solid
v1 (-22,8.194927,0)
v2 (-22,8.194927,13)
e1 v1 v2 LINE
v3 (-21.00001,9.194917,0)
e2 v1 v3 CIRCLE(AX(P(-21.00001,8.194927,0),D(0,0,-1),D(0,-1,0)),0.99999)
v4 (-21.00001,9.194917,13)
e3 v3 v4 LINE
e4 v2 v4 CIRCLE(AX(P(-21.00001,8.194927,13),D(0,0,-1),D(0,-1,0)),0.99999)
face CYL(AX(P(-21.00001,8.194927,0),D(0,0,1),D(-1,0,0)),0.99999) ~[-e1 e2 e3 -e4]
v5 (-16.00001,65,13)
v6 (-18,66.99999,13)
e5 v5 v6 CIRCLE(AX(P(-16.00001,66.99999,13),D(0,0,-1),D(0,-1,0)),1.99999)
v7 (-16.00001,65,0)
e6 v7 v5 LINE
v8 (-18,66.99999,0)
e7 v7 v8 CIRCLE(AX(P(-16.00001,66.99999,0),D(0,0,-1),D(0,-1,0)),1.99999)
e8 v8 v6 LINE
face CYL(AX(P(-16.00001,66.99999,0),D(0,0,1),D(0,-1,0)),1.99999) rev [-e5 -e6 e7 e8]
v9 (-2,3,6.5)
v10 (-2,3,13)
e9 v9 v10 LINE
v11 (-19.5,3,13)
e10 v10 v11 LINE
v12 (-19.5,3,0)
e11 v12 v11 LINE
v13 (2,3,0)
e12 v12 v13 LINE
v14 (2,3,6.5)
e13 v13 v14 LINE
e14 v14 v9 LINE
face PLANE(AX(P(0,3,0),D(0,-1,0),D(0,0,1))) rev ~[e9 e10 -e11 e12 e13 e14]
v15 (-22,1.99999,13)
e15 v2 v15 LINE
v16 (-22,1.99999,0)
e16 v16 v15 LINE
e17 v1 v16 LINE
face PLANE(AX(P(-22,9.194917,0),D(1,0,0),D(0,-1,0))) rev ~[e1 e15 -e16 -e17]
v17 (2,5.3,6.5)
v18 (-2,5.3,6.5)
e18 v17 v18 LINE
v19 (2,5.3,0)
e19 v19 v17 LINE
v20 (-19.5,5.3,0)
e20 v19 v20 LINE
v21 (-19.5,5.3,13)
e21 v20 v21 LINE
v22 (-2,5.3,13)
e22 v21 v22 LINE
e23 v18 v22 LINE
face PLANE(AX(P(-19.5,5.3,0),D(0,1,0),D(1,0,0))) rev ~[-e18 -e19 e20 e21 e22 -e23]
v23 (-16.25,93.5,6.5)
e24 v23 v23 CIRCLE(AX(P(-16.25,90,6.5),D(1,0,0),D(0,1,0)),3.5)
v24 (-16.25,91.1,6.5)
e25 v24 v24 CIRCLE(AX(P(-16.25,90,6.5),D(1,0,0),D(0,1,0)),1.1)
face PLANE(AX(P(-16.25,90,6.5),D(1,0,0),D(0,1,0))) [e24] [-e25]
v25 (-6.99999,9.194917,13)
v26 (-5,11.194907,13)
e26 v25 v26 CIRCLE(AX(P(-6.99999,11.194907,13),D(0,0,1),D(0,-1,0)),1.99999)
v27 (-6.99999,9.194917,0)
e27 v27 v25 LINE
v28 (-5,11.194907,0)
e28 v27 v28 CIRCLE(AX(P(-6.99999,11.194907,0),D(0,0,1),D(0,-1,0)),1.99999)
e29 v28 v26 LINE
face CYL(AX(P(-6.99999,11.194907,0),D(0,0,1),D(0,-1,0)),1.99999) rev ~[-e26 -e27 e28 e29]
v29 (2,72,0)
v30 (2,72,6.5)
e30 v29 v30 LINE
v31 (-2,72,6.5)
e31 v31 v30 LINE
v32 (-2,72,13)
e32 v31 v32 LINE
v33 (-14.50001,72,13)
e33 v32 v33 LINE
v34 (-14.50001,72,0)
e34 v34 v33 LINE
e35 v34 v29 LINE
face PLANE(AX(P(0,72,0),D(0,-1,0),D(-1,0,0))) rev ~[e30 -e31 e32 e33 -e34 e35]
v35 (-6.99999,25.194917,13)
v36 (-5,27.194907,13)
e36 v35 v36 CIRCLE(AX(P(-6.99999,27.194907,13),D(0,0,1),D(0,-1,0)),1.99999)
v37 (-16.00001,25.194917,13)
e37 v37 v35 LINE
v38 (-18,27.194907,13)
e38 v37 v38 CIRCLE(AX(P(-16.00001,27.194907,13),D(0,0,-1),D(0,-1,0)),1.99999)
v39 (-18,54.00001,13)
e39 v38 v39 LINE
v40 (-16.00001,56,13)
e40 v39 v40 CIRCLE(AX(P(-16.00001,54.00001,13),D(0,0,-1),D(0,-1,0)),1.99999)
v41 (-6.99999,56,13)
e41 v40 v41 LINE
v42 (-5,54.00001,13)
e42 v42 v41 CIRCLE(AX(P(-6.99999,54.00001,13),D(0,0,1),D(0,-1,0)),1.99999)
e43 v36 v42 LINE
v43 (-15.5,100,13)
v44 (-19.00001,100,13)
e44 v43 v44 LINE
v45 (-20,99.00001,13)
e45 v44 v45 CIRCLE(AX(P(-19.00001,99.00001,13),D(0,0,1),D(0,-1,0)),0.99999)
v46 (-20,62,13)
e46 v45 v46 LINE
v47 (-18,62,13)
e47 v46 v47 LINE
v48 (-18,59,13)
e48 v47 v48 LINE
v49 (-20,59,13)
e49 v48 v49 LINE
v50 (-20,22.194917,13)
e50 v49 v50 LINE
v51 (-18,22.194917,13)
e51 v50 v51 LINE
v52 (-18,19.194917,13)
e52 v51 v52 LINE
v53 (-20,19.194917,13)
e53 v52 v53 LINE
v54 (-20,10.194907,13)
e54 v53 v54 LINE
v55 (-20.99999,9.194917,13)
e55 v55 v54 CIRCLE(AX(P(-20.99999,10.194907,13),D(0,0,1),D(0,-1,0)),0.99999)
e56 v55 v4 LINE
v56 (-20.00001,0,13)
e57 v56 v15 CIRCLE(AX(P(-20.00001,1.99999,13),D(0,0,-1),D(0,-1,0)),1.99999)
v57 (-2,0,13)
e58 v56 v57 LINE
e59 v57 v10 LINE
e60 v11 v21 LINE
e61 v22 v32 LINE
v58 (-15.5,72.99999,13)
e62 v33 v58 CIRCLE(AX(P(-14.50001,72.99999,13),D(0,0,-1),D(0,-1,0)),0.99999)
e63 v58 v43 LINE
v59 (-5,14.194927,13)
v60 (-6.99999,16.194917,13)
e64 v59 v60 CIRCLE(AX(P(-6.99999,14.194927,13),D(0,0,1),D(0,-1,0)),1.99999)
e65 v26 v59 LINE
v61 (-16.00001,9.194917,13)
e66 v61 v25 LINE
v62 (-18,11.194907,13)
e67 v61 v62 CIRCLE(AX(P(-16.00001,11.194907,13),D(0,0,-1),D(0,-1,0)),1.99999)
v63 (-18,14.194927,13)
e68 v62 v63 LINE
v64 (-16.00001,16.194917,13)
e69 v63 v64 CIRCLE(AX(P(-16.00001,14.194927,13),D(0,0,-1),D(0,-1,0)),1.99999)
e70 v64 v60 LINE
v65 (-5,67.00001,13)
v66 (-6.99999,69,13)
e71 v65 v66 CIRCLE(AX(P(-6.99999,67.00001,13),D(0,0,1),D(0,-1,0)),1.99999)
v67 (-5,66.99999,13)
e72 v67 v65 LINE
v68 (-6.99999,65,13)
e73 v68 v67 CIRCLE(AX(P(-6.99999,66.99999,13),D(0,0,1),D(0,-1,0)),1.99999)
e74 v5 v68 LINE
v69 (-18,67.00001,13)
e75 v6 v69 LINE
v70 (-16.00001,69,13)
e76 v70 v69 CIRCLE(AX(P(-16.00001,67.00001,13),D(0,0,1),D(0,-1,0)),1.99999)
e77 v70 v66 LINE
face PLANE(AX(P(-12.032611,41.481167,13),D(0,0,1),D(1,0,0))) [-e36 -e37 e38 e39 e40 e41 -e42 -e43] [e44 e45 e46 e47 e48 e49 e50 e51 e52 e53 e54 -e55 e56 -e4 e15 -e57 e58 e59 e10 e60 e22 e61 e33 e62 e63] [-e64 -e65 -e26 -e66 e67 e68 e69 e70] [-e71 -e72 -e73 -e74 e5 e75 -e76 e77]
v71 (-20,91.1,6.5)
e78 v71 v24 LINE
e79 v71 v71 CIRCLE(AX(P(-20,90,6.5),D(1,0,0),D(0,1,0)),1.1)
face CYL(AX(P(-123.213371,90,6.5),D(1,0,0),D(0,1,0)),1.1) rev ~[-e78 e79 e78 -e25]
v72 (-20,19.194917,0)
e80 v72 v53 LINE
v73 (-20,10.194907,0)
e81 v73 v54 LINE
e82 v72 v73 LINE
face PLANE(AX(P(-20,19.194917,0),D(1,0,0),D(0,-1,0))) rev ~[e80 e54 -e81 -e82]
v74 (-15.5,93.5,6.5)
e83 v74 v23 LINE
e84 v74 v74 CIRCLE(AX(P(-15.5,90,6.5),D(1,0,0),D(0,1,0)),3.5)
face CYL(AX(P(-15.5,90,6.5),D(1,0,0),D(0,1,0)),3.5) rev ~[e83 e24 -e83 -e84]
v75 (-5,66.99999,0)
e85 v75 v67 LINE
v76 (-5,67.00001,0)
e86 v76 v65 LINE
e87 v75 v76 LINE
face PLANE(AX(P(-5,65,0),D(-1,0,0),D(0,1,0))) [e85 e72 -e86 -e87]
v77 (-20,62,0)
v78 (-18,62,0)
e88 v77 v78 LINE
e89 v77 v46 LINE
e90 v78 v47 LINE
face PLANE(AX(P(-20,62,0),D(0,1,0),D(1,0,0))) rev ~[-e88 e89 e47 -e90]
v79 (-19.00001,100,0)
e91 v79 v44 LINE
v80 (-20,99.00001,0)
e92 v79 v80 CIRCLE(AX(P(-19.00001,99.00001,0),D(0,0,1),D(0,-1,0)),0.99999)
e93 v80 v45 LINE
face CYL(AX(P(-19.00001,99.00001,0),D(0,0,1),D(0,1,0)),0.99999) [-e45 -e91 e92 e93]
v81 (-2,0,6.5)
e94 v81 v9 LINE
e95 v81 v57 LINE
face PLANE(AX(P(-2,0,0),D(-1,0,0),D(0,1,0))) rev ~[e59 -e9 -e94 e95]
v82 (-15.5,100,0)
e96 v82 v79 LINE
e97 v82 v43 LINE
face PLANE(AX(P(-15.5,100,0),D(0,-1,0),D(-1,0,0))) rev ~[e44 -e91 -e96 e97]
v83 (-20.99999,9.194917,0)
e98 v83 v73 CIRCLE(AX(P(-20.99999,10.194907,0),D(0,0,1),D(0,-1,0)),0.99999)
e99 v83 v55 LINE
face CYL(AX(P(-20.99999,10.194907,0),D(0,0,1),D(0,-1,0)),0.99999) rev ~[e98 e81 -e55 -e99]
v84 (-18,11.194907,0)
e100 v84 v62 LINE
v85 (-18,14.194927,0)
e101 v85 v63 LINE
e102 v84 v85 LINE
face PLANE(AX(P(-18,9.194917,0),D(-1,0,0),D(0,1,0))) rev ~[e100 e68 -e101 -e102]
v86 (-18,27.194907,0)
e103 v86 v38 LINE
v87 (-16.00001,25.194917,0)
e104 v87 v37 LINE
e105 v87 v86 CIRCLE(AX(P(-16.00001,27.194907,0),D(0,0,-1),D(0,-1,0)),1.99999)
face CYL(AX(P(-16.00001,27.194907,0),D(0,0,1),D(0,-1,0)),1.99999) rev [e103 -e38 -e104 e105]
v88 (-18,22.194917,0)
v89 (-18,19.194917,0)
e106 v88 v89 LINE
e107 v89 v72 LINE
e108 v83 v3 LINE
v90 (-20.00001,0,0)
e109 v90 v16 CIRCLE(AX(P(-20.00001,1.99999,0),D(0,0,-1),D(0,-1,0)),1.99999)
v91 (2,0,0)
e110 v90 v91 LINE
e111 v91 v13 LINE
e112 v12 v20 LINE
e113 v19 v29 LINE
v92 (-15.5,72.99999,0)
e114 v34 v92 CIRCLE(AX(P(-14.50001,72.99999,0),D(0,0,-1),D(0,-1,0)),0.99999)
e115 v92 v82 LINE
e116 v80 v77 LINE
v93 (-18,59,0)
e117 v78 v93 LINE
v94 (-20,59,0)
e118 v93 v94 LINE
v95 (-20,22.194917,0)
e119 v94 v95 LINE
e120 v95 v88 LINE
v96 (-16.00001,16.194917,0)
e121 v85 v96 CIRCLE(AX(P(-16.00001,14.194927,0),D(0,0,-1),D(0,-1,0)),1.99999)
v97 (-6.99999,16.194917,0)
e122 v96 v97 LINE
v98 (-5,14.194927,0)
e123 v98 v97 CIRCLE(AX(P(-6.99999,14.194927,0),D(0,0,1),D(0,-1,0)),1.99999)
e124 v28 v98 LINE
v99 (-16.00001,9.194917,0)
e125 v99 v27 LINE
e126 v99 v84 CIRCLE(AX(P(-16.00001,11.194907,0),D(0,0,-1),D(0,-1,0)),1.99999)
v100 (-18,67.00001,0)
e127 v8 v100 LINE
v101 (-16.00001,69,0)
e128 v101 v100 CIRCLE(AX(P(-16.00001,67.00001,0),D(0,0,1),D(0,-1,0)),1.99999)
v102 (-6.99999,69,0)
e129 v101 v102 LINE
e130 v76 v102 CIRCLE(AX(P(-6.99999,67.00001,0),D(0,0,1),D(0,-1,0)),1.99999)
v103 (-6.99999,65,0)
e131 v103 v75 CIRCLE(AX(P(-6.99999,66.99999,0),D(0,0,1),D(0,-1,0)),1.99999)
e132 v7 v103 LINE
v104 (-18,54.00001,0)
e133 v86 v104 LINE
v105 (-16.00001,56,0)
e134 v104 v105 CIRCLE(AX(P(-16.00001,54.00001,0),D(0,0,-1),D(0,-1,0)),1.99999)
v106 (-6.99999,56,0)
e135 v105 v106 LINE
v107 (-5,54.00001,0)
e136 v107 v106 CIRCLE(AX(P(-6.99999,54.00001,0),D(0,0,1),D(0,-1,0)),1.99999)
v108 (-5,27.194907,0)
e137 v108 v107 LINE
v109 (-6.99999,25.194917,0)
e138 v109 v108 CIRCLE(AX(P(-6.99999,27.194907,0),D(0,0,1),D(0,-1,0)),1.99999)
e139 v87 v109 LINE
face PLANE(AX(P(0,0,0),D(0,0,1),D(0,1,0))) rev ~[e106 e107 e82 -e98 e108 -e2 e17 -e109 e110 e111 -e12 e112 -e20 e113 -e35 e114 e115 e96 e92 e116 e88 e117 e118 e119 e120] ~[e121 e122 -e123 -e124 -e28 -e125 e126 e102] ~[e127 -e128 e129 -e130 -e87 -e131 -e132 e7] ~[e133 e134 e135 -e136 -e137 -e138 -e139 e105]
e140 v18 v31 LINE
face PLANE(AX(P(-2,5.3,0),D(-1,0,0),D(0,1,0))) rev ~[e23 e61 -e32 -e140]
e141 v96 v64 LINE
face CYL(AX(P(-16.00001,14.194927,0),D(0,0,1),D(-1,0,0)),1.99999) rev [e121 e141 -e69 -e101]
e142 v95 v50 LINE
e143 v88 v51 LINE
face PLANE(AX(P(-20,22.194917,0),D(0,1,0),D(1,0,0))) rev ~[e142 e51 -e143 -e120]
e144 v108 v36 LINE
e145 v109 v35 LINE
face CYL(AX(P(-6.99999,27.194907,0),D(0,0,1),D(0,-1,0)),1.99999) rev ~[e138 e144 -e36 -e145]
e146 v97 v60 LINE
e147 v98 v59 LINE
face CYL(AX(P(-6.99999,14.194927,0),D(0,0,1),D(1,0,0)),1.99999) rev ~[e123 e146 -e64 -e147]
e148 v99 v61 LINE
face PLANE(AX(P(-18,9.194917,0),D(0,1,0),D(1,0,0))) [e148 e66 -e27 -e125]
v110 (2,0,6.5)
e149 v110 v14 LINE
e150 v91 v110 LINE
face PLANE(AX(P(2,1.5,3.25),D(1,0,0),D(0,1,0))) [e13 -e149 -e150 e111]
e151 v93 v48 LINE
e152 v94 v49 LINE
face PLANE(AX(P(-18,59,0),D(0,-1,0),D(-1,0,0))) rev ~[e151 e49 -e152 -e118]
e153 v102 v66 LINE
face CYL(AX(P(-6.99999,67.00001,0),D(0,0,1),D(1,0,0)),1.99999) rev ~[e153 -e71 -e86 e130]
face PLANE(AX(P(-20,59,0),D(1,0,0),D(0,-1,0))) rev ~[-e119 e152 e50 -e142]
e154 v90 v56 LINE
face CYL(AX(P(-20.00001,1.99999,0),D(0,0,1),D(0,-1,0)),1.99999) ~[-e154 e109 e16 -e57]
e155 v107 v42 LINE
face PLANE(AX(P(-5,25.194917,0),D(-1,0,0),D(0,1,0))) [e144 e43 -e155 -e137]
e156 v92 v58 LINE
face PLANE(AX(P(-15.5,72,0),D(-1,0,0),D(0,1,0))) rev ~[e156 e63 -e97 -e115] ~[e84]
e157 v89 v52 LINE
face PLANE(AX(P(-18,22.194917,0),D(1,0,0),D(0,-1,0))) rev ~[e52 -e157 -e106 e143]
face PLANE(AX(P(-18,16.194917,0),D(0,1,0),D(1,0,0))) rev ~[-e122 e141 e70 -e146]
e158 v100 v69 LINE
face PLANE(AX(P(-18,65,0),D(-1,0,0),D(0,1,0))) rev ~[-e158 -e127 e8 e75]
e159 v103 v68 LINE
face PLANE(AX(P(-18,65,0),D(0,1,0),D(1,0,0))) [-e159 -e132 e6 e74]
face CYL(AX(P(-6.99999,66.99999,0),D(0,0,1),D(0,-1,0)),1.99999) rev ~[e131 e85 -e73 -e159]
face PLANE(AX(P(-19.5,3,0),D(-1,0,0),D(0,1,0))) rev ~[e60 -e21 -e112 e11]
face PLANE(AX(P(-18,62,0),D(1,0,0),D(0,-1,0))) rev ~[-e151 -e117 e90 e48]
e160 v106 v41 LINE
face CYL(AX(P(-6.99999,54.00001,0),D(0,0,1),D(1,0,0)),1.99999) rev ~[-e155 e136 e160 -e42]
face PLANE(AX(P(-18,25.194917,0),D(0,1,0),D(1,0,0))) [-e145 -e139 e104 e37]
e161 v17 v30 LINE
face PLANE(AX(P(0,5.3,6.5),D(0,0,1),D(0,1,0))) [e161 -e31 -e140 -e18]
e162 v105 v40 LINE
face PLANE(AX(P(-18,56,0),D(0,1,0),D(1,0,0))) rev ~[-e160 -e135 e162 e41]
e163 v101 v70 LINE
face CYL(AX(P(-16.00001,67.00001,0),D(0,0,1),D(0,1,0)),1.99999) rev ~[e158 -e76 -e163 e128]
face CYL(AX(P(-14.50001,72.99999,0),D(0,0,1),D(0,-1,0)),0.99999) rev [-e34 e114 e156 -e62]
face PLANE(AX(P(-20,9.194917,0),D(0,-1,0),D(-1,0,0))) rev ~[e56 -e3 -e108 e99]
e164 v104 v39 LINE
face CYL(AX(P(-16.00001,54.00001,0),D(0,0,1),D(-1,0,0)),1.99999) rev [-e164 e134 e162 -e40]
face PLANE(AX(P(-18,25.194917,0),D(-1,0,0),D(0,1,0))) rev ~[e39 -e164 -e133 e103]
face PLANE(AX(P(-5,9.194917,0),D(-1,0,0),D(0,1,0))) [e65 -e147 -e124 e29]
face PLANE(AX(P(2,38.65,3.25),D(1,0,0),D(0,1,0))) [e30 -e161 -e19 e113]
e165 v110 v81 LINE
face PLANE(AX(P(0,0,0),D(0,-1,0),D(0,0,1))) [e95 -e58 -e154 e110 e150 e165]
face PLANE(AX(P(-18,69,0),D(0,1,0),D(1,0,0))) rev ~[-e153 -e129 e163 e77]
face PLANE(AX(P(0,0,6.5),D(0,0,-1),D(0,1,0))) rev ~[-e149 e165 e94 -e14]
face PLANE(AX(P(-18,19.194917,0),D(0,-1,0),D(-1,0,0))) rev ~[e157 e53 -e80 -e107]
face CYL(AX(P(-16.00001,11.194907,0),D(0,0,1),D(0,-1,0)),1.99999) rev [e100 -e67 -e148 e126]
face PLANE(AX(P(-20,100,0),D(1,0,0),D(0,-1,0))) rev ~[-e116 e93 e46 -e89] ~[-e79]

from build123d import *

# Parameters (mm, degrees)
F0_W      = 13
F0_H      = 7
F0_H_2    = 30.8050829545
F0_H_3    = 4
F1_DEPTH  = 13
F3_R      = 1.99999
F4_R      = 0.99999
F5_D      = 2.2
F7_W      = 3
F7_H      = 6.5
F6_W      = 66.7
F6_H      = 6.5
F8_DEPTH  = 2
F9_DEPTH  = 2
F10_R     = 3.5
F10_R_2   = 1.1
F11_DEPTH = 0.75


# Not quite as in the source:
# - a fillet or chamfer is up to 0.001 mm smaller than in the source, because OpenCascade refuses the exact size


with BuildPart() as f1:
    # F0 (on Top) → F1 (new body)
    with BuildSketch(Plane.XY):
        Polygon((-22, 0), (0, 0), (0, 3), (-19.5, 3), (-19.5, 5.3), (0, 5.3), (0, 72), (-15.5, 72), (-15.5, 100), (-20, 100), (-20, 62), (-18, 62), (-18, 59), (-20, 59), (-20, 22.1949170455), (-18, 22.1949170455), (-18, 19.1949170455), (-20, 19.1949170455), (-20, 9.1949170455), (-22, 9.1949170455), align=None)
        with Locations((-11.5, 12.6949170455)):
            Rectangle(F0_W, F0_H, mode=Mode.SUBTRACT)
        with Locations((-11.5, 40.5974585228)):
            Rectangle(F0_W, F0_H_2, mode=Mode.SUBTRACT)
        with Locations((-11.5, 67)):
            Rectangle(F0_W, F0_H_3, mode=Mode.SUBTRACT)
    extrude(amount=F1_DEPTH)

    # F3 (radius 2 in the source; OpenCascade refuses exactly that, so slightly less here)
    f3_edges = [f1.edges().sort_by_distance(p)[0] for p in [
        (-22, 0, 6.5),
        (-18, 69, 6.5),
        (-18, 65, 6.5),
        (-5, 69, 6.5),
        (-5, 65, 6.5),
        (-18, 56, 6.5),
        (-5, 56, 6.5),
        (-18, 25.194917, 6.5),
        (-5, 25.194917, 6.5),
        (-18, 9.194917, 6.5),
        (-5, 9.194917, 6.5),
        (-5, 16.194917, 6.5),
        (-18, 16.194917, 6.5),
    ]]
    fillet(f3_edges, radius=F3_R)

    # F4 (radius 1 in the source; OpenCascade refuses exactly that, so slightly less here)
    f4_edges = [f1.edges().sort_by_distance(p)[0] for p in [
        (-15.5, 72, 6.5),
        (-20, 100, 6.5),
        (-22, 9.194917, 6.5),
        (-20, 9.194917, 6.5),
    ]]
    fillet(f4_edges, radius=F4_R)

    # F5 (through all)
    with Locations(Plane(origin=(-20, 0, 0), x_dir=(0, -1, 0), z_dir=(-1, 0, 0))):
        with Locations((-90, 6.5)):
            Hole(F5_D / 2)

    # F7 (on face) + F6 (on face) → F8 (join)
    with BuildSketch(Plane.YZ):
        with Locations((1.5, 3.25)):
            Rectangle(F7_W, F7_H)
    with BuildSketch(Plane.YZ):
        with Locations((38.65, 3.25)):
            Rectangle(F6_W, F6_H)
    extrude(amount=F8_DEPTH)

    # F9 (cut): faces of the model
    f9_faces = [f1.faces().sort_by_distance(p)[0] for p in [
        (0, 1.5, 9.75),
        (0, 38.65, 9.75),
    ]]
    extrude(f9_faces, amount=-F9_DEPTH, mode=Mode.SUBTRACT)

    # F10 (on face) → F11 (cut)
    with BuildSketch(Plane.YZ.offset(-15.5)):
        with Locations((90, 6.5)):
            Circle(F10_R)
        with Locations((90, 6.5)):
            Circle(F10_R_2, mode=Mode.SUBTRACT)
    extrude(amount=-F11_DEPTH, mode=Mode.SUBTRACT)


solid = f1.part
